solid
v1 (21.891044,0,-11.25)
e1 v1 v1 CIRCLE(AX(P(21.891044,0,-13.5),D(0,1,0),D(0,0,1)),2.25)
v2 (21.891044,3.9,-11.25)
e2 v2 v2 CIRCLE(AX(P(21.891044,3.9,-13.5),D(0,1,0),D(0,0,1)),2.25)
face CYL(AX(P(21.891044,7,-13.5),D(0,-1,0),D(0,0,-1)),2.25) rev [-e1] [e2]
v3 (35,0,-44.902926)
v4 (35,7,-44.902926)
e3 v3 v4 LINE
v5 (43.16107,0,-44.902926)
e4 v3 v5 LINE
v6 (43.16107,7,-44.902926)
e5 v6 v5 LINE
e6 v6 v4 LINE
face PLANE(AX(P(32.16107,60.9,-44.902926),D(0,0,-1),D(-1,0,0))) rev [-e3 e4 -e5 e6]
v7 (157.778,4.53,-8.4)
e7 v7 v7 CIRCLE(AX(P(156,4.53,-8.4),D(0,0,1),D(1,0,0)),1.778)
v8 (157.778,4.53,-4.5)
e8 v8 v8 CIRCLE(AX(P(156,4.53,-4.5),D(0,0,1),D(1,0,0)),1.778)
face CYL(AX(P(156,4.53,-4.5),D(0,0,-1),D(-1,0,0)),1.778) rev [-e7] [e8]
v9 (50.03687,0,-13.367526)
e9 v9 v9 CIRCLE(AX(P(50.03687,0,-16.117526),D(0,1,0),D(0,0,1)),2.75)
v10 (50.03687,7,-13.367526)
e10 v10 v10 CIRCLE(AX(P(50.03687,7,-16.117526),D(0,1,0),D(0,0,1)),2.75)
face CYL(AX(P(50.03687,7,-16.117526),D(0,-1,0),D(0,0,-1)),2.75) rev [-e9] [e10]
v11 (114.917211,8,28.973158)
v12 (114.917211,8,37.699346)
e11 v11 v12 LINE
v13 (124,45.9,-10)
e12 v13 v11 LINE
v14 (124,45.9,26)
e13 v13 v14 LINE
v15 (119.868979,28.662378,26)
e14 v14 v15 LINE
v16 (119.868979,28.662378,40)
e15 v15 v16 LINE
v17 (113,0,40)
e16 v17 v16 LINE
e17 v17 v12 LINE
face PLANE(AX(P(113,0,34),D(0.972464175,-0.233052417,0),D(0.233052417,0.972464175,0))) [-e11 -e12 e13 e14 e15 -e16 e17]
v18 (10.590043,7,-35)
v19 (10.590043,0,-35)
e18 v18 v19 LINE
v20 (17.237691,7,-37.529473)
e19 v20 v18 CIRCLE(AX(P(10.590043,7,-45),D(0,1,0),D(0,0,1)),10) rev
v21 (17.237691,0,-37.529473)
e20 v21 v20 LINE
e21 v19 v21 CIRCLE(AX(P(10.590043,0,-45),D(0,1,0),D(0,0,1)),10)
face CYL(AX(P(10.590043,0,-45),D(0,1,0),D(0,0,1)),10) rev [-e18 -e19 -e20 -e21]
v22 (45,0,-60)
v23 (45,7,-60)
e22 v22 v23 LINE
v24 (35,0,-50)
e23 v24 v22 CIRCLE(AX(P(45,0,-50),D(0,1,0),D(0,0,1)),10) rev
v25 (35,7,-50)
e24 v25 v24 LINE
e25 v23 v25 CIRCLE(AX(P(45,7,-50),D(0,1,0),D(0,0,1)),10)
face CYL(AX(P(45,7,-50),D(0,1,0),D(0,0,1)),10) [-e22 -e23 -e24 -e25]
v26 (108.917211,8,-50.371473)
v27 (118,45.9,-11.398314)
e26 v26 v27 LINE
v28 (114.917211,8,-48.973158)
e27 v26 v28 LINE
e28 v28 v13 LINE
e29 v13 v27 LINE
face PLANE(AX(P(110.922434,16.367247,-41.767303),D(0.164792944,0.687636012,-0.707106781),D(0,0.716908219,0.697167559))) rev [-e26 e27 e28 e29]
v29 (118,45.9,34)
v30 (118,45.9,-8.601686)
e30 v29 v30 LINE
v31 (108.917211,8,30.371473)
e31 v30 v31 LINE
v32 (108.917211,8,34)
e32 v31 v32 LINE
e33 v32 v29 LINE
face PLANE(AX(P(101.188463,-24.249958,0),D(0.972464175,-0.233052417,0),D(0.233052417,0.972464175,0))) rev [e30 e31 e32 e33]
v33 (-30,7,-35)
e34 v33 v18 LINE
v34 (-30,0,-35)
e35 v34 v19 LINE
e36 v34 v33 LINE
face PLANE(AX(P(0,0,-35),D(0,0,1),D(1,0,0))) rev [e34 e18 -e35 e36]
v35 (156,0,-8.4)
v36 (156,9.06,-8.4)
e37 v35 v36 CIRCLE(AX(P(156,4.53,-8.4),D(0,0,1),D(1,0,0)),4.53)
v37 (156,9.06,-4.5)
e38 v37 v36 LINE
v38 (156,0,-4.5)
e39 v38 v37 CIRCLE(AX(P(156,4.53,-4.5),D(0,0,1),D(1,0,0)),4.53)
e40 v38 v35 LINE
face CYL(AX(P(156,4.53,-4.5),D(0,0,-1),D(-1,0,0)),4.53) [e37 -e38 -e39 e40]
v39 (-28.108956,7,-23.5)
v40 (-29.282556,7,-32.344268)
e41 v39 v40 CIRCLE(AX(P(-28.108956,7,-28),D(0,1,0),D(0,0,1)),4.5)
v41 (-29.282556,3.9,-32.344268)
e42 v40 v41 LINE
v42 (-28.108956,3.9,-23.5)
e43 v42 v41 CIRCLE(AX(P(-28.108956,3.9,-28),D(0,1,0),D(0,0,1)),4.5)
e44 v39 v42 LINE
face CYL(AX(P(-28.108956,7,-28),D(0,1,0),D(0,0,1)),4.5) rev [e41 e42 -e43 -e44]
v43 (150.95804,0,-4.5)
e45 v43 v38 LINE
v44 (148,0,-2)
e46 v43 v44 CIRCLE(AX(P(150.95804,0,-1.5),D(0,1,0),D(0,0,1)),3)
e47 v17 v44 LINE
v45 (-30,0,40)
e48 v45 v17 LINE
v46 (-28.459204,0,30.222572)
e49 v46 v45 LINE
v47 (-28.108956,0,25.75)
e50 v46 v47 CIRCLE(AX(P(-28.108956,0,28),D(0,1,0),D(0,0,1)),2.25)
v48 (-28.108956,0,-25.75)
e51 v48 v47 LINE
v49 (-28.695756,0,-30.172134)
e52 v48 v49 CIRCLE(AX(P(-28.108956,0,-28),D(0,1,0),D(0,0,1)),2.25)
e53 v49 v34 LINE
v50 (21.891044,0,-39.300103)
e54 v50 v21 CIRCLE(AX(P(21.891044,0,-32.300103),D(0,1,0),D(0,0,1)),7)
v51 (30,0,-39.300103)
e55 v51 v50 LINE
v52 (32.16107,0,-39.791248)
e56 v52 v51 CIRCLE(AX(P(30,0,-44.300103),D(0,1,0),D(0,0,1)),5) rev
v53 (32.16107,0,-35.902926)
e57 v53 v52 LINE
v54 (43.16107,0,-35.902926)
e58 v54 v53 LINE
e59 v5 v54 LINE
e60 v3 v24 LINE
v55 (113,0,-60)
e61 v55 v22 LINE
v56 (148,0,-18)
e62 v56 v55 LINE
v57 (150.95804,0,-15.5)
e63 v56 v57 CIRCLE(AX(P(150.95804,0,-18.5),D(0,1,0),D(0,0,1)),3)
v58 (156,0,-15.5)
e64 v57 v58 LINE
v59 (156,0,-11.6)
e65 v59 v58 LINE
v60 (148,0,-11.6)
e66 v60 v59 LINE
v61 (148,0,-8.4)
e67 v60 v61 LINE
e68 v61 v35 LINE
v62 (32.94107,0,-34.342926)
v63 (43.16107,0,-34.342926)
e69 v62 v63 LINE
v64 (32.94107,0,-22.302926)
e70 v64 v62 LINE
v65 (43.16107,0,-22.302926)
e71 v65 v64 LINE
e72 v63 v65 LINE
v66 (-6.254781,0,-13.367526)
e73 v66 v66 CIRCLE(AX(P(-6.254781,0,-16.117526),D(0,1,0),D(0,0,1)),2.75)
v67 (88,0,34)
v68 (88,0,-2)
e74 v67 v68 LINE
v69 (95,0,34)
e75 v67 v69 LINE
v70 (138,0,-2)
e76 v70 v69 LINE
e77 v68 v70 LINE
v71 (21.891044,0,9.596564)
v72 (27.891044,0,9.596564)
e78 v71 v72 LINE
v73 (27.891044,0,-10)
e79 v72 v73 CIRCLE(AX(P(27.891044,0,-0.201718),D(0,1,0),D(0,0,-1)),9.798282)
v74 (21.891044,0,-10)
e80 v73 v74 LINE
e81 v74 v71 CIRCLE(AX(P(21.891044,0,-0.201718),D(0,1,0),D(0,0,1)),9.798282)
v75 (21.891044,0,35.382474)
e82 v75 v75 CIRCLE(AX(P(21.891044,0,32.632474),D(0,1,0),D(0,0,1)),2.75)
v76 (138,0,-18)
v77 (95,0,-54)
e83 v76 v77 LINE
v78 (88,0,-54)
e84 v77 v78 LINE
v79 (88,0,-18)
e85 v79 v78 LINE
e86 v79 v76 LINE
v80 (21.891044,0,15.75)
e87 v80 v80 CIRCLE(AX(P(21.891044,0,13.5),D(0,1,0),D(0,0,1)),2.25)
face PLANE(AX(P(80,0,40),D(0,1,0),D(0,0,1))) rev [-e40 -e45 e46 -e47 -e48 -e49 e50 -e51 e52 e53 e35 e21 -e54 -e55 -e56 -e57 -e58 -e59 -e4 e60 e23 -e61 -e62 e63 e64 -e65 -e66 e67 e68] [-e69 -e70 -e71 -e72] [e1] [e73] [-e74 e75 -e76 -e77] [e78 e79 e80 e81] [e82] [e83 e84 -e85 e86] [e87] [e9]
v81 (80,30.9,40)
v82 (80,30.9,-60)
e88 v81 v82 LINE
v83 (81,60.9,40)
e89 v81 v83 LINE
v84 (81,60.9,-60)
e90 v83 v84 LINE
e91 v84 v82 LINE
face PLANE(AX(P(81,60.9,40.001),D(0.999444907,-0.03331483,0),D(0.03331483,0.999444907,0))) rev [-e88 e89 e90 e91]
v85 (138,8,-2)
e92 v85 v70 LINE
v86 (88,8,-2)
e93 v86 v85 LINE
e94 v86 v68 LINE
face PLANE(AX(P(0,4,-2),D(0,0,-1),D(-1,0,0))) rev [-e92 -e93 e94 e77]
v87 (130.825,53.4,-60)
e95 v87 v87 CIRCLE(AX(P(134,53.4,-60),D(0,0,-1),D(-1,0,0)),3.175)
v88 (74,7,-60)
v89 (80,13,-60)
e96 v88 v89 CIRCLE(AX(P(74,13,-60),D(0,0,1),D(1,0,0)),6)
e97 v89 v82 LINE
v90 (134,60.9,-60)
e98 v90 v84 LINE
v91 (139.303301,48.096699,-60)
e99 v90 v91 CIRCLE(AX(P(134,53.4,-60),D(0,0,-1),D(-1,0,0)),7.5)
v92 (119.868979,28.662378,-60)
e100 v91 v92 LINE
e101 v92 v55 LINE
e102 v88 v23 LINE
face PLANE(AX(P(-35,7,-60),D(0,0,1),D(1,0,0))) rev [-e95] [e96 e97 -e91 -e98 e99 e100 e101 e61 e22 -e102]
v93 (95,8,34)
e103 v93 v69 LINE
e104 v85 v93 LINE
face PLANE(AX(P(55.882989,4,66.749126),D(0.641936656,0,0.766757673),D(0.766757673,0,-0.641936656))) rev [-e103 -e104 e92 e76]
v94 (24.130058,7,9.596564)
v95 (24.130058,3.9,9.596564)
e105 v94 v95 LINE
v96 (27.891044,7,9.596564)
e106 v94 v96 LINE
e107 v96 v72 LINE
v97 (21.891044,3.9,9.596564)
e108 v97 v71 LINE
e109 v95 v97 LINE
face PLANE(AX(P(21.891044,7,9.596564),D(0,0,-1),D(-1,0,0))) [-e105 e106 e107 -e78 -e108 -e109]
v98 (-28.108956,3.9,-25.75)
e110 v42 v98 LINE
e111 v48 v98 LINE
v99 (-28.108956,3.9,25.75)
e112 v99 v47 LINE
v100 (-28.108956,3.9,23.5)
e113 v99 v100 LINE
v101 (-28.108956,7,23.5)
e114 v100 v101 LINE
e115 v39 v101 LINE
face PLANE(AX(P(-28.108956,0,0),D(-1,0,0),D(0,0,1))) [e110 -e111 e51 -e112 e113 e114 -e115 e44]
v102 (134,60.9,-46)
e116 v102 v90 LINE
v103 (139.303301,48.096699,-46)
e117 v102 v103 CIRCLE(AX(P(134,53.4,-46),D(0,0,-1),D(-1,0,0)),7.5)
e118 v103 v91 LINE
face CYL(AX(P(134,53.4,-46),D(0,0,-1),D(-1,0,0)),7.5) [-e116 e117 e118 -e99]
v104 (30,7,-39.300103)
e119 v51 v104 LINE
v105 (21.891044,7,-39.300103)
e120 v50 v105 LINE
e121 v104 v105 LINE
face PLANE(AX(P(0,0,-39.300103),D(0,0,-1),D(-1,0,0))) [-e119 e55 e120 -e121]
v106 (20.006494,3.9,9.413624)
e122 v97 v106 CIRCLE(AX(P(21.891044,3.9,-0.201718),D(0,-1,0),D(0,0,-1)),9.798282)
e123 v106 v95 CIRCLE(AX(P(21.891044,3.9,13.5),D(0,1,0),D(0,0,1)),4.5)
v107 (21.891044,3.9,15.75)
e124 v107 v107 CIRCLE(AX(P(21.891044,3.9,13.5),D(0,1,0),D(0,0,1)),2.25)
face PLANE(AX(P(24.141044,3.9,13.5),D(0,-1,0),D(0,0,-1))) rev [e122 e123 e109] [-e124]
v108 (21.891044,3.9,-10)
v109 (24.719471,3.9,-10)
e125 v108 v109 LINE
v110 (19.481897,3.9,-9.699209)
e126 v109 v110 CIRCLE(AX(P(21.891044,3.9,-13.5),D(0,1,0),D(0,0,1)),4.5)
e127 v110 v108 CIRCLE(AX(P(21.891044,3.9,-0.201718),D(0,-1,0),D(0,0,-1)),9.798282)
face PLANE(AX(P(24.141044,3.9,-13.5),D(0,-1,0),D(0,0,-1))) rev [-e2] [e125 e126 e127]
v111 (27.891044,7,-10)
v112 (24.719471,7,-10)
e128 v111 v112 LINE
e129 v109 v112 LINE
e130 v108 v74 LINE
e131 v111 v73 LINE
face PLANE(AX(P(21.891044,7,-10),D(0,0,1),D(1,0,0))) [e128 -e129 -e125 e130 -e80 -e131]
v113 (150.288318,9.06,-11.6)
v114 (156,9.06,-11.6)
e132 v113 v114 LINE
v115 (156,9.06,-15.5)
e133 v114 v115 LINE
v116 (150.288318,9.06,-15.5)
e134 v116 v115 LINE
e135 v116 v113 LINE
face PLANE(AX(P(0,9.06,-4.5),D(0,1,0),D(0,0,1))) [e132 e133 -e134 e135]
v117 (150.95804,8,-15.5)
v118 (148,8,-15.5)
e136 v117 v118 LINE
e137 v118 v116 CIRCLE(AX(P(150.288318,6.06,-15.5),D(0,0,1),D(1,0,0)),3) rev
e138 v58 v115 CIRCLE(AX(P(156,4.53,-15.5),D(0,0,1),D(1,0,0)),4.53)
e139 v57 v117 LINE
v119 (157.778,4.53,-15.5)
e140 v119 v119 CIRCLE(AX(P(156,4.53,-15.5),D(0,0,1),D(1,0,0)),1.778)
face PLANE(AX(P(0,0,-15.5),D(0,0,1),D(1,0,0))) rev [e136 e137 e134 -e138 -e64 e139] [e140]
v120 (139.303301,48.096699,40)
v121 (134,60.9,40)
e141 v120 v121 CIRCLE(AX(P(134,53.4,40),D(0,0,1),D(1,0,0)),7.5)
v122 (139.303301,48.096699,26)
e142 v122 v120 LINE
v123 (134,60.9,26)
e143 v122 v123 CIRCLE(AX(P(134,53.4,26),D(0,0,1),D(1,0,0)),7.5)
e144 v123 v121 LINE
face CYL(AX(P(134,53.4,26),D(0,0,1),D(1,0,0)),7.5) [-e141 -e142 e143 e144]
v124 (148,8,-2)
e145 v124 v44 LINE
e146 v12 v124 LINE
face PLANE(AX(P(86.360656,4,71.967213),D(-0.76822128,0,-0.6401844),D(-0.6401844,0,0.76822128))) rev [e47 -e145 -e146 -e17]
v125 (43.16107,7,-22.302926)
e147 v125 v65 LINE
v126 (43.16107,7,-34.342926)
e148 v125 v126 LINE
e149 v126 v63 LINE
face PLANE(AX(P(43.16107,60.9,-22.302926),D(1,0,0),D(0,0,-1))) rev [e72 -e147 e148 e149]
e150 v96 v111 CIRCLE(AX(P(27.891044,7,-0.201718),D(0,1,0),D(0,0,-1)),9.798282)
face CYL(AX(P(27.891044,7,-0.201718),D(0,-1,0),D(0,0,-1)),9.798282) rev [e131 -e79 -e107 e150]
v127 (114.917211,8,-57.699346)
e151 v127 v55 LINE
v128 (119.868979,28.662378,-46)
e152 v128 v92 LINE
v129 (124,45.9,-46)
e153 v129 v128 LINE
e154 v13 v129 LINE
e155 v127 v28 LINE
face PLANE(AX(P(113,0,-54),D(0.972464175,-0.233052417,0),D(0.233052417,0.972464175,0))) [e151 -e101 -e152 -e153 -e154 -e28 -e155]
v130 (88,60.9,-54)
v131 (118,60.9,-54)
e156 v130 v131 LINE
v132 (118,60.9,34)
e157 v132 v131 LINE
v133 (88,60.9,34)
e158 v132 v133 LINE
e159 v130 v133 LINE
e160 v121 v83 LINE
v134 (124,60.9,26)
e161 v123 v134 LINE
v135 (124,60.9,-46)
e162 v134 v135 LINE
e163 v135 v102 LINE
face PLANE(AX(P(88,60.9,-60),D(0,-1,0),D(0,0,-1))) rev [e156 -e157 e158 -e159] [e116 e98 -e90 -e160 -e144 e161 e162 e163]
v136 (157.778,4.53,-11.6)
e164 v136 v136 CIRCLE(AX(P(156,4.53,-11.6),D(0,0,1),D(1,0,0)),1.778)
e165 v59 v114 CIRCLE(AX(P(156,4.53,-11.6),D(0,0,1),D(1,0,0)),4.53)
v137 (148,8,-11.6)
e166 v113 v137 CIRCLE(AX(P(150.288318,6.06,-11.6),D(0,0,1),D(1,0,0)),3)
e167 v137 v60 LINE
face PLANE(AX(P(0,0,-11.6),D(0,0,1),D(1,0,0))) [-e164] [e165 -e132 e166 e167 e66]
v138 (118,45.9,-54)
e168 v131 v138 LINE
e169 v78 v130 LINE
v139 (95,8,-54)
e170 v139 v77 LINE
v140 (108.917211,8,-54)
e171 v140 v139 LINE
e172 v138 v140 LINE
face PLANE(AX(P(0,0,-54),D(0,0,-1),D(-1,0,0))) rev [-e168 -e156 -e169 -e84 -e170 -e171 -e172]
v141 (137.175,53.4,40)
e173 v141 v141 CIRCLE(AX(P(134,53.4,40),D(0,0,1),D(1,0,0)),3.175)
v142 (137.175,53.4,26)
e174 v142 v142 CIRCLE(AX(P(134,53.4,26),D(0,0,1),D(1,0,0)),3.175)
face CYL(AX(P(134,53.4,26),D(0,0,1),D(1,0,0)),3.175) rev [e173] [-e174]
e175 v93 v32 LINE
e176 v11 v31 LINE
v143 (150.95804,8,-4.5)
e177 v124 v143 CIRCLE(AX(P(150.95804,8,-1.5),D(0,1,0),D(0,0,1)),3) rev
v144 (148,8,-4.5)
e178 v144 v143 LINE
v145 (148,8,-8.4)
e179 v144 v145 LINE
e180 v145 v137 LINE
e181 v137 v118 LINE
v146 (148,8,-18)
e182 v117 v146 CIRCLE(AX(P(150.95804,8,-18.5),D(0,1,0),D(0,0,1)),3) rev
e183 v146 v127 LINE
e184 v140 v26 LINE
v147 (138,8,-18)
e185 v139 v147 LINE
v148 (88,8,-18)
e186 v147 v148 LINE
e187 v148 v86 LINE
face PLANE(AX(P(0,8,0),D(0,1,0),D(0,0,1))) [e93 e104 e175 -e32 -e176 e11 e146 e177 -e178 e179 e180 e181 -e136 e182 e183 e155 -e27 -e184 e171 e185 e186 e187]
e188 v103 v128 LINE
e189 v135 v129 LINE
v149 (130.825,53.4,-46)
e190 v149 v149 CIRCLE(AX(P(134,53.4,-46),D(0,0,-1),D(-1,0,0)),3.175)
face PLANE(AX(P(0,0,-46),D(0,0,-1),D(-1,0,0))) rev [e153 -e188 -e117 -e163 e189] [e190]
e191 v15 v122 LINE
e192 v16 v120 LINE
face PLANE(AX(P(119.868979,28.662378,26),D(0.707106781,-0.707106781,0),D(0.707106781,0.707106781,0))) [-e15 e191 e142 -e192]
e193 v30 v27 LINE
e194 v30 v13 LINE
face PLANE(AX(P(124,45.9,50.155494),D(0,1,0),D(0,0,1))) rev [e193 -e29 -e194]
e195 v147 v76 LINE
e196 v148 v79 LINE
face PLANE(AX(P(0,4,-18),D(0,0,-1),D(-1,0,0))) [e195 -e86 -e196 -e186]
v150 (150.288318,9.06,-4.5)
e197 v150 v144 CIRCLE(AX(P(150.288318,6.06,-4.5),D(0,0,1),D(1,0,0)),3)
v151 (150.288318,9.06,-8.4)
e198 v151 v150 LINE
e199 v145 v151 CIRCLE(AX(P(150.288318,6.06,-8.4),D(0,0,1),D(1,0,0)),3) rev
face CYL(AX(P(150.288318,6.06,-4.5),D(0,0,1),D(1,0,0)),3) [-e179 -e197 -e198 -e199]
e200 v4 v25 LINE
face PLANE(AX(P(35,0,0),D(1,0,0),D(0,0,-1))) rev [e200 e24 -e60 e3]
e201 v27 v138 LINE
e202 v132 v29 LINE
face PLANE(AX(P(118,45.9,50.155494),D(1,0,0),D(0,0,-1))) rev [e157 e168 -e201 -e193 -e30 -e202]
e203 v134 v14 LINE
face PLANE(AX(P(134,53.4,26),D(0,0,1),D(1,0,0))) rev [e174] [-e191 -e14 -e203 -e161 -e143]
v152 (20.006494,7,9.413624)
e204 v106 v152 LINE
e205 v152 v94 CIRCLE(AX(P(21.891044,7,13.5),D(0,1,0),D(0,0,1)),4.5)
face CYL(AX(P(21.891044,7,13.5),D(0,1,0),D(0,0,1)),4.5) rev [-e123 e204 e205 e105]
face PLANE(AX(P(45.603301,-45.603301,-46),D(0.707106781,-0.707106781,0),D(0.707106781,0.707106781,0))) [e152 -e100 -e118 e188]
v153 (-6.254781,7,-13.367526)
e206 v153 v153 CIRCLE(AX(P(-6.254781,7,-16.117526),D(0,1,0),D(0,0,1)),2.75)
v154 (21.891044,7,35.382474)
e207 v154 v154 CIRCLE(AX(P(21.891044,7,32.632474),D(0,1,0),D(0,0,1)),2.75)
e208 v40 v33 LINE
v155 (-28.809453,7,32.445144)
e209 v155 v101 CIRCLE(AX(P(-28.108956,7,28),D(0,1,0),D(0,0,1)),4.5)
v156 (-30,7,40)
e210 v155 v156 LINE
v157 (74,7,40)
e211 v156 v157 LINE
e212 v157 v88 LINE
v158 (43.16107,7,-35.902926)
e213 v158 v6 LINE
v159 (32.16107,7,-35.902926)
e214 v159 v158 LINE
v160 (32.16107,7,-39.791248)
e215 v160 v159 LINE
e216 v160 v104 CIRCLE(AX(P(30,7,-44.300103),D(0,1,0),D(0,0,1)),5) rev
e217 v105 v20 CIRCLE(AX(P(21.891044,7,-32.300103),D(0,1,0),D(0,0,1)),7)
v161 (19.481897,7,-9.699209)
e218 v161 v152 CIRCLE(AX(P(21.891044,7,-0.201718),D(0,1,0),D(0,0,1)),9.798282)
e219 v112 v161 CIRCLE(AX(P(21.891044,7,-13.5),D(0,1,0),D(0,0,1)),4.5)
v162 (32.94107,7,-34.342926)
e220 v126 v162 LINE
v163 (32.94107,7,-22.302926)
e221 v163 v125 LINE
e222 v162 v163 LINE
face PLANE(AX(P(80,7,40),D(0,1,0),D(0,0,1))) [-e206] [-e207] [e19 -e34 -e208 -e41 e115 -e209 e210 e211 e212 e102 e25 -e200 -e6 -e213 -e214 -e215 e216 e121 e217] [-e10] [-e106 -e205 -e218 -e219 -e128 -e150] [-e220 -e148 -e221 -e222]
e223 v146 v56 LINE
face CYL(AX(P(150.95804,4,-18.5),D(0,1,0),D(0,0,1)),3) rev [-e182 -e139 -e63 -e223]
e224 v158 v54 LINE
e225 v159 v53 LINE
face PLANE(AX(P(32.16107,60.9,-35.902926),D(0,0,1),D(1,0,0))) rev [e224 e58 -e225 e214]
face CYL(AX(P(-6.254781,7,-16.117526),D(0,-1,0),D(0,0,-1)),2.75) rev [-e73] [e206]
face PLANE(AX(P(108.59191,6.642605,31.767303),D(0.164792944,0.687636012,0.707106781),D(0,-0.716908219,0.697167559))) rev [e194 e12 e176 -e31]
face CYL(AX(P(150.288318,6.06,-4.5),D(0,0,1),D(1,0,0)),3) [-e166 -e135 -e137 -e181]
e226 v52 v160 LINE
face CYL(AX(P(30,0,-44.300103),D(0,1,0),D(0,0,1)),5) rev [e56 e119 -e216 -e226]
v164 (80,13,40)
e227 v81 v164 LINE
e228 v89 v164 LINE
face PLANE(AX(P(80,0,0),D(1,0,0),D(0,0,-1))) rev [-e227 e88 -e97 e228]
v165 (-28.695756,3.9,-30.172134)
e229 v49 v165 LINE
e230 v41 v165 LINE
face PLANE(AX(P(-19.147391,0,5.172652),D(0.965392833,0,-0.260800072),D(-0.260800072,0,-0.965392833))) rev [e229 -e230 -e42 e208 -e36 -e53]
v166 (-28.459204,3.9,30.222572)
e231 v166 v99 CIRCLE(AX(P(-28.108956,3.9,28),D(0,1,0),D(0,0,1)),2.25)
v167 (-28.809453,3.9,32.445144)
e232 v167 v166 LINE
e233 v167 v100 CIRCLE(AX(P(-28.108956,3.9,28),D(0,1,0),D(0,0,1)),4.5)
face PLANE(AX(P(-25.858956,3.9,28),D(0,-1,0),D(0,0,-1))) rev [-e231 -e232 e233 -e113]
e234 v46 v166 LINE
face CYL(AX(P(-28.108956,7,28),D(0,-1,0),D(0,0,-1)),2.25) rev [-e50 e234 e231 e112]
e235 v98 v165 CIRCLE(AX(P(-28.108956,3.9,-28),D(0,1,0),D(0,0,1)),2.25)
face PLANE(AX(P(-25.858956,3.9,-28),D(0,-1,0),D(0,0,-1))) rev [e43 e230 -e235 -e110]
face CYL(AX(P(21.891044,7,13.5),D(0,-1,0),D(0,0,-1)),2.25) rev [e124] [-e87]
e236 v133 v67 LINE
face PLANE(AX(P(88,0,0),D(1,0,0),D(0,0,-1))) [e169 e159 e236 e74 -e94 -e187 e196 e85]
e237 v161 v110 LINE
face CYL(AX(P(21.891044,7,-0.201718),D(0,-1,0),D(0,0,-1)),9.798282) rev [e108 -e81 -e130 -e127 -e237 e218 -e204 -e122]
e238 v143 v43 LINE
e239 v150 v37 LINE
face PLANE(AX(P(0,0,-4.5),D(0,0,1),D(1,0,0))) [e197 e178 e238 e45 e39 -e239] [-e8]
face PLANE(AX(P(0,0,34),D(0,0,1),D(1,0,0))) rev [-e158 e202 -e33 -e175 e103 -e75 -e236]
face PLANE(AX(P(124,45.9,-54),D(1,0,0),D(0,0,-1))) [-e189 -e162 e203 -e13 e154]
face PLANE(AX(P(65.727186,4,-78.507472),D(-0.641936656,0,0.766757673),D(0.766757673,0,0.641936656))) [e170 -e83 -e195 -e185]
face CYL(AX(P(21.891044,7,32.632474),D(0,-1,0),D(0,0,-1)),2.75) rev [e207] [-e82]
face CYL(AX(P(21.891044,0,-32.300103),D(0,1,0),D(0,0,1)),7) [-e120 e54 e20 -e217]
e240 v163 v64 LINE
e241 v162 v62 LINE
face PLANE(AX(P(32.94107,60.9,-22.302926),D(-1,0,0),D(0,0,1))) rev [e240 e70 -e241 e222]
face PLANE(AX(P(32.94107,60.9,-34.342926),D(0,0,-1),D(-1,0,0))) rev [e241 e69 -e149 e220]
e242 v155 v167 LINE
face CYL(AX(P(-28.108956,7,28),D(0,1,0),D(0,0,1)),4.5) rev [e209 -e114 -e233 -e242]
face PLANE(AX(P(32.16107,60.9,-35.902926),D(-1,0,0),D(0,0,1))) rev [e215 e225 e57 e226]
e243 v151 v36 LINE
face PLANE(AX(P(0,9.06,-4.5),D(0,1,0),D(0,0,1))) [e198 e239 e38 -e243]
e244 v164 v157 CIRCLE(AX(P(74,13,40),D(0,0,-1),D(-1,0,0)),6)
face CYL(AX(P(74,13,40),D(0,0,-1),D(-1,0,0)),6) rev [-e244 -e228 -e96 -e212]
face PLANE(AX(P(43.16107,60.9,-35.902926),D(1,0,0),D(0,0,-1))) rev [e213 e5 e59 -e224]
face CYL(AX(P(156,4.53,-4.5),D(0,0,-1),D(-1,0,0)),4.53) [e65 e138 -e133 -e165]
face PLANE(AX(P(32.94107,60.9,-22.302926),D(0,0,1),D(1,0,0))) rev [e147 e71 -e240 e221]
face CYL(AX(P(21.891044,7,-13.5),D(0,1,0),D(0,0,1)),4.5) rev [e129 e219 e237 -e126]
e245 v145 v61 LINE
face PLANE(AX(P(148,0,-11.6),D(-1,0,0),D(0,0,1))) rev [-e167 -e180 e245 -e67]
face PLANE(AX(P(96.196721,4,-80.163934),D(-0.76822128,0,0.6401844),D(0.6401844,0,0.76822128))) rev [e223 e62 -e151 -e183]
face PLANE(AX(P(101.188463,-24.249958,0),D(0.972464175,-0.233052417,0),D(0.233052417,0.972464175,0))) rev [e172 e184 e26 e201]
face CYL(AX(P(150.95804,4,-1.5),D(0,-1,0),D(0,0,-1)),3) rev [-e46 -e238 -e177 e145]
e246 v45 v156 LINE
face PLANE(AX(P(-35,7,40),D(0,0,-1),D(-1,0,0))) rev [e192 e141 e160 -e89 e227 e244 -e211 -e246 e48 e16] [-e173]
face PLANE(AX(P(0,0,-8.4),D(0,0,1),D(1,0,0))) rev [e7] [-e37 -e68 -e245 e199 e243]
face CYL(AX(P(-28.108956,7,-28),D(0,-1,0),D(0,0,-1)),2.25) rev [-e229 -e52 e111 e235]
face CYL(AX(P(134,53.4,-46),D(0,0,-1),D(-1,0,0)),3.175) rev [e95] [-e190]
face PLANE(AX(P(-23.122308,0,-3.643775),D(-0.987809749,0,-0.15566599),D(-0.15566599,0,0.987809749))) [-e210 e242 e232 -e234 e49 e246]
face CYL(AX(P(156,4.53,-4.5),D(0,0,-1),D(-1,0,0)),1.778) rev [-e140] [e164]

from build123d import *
from build123d.topology import SkipClean

# Parameters (mm, degrees)
SKETCH1_W                                        = 115
SKETCH1_H                                        = 100
EXTRUDE1_DEPTH                                   = 7
SKETCH2_R                                        = 2.75
SKETCH2_R_2                                      = 2.25
EXTRUDE7_DEPTH                                   = 7
CBORE_FOR_M4_PAN_HEAD_MACHINE_SCREW2_D           = 4.5
CBORE_FOR_M4_PAN_HEAD_MACHINE_SCREW2_CBORE_D     = 9
CBORE_FOR_M4_PAN_HEAD_MACHINE_SCREW2_CBORE_DEPTH = 3.1
EXTRUDE9_DEPTH                                   = 101.244700608
FILLET1_R                                        = 10
SKETCH19_W                                       = 100
SKETCH19_H                                       = 60.9
BOSS_EXTRUDE1_DEPTH                              = 8
BOSS_EXTRUDE2_DEPTH                              = 6
BOSS_EXTRUDE3_DEPTH                              = 6
SKETCH22_W                                       = 6
SKETCH22_H                                       = 15
BOSS_EXTRUDE4_DEPTH                              = 88
BOSS_EXTRUDE5_DEPTH                              = 5.834785
SKETCH25_R                                       = 3.175
BOSS_EXTRUDE6_DEPTH                              = 14
BOSS_EXTRUDE7_START                              = -14
SKETCH26_R                                       = 3.175
BOSS_EXTRUDE7_DEPTH                              = 14
FILLET2_R                                        = 6
BOSS_EXTRUDE8_DEPTH                              = 4
BOSS_EXTRUDE9_DEPTH                              = 4
BOSS_EXTRUDE10_DEPTH                             = 5.5
CUT_EXTRUDE1_DEPTH                               = 1.6
FILLET3_R                                        = 3
SKETCH30_W                                       = 10.22
SKETCH30_H                                       = 12.04
SKETCH30_W_2                                     = 11
SKETCH30_H_2                                     = 9
CUT_EXTRUDE2_DEPTH                               = 182.875481855
CUT_EXTRUDE3_REACH                               = 200.692


with BuildPart() as part:
    # Sketch1 → Extrude1 (new body)
    with BuildSketch(Plane(origin=(0, 0, 0), x_dir=(1, 0, 0), z_dir=(0, 1, 0))):
        with Locations((22.5, 10)):
            Rectangle(SKETCH1_W, SKETCH1_H)
    extrude(amount=EXTRUDE1_DEPTH)

    # Sketch2 → Extrude7 (cut)
    with BuildSketch(Plane(origin=(0, 0, 0), x_dir=(1, 0, 0), z_dir=(0, 1, 0))):
        with Locations(Location((-6.254781434, 16.117525773, 0), (0, 0, 270))):
            Circle(SKETCH2_R)
        with Locations(Location((50.036869812, 16.117525773, 0), (0, 0, 270))):
            Circle(SKETCH2_R)
        with Locations(Location((-28.108955811, -28, 0), (0, 0, 270))):
            Circle(SKETCH2_R_2)
        with Locations(Location((-28.108955811, 28, 0), (0, 0, 270))):
            Circle(SKETCH2_R_2)
        with Locations(Location((21.891044189, -32.632474227, 0), (0, 0, 270))):
            Circle(SKETCH2_R)
        with Locations(Location((21.891044189, -13.5, 0), (0, 0, 270))):
            Circle(SKETCH2_R_2)
        with Locations(Location((21.891044189, 13.5, 0), (0, 0, 270))):
            Circle(SKETCH2_R_2)
        with BuildLine():
            Line((21.891044189, 10), (27.891044189, 10))
            ThreePointArc((27.891044189, 10), (37.689325953, 0.201718236), (27.891044189, -9.596563528))
            Line((27.891044189, -9.596563528), (21.891044189, -9.596563528))
            ThreePointArc((21.891044189, -9.596563528), (12.092762425, 0.201718236), (21.891044189, 10))
        make_face()
    extrude(amount=EXTRUDE7_DEPTH, mode=Mode.SUBTRACT)

    # CBORE for M4 Pan Head Machine Screw2 (through all)
    with Locations(Plane(origin=(-28.108955811, 7, -28), x_dir=(0, 0, 1), z_dir=(0, 1, 0))):
        with Locations((0, 0), (14.5, 50), (41.5, 50), (56, 0)):
            CounterBoreHole(CBORE_FOR_M4_PAN_HEAD_MACHINE_SCREW2_D / 2, CBORE_FOR_M4_PAN_HEAD_MACHINE_SCREW2_CBORE_D / 2, CBORE_FOR_M4_PAN_HEAD_MACHINE_SCREW2_CBORE_DEPTH)

    # Sketch18 → Extrude9 (cut, through all)
    with BuildSketch(Plane(origin=(0, 7, 0), x_dir=(1, 0, 0), z_dir=(0, 1, 0))):
        with BuildLine():
            Line((21.891044189, 39.300103485), (30, 39.300103485))
            ThreePointArc((30, 39.300103485), (33.535533906, 40.764569579), (35, 44.300103485))
            Line((35, 44.300103485), (35, 60))
            Line((35, 60), (-35, 60))
            Line((-35, 60), (-35, 35))
            Line((-35, 35), (-35, -40))
            Line((-35, -40), (-30, -40))
            Line((-30, -40), (-28.108955811, -28))
            Line((-28.108955811, -28), (-28.108955811, 28))
            Line((-28.108955811, 28), (-30, 35))
            Line((-30, 35), (15.43267297, 35))
            ThreePointArc((15.43267297, 35), (18.01156456, 38.126735256), (21.891044189, 39.300103485))
        make_face()
    extrude(amount=-EXTRUDE9_DEPTH, mode=Mode.SUBTRACT)

    # Fillet1
    fillet1_edges = [part.edges().sort_by_distance(p)[0] for p in [
        (15.43267297, 3.5, -35),
        (35, 3.5, -60),
    ]]
    fillet(fillet1_edges, radius=FILLET1_R)

    # Sketch19 → Boss-Extrude1 (add)
    with BuildSketch(Plane(origin=(80, 0, 0), x_dir=(0, 0, -1), z_dir=(1, 0, 0))):
        with Locations((10, 30.45)):
            Rectangle(SKETCH19_W, SKETCH19_H)
    extrude(amount=BOSS_EXTRUDE1_DEPTH)

    # Sketch20 → Boss-Extrude2 (add)
    with BuildSketch(Plane(origin=(0, 0, -60), x_dir=(-1, 0, 0), z_dir=(0, 0, -1))):
        Polygon((-88, 0), (-113, 0), (-124, 45.9), (-124, 60.9), (-88, 60.9), (-80, 60.9), (-80, 7), (-45, 7), (-45, 0), align=None)
    extrude(amount=-BOSS_EXTRUDE2_DEPTH)

    # Sketch21 → Boss-Extrude3 (add)
    with BuildSketch(Plane.XY.offset(40)):
        Polygon((88, 60.9), (88, 0), (113, 0), (124, 45.9), (124, 60.9), align=None)
    extrude(amount=-BOSS_EXTRUDE3_DEPTH)

    # Sketch22 → Boss-Extrude4 (add)
    with BuildSketch(Plane.XY.offset(-54)):
        with Locations((121, 53.4)):
            Rectangle(SKETCH22_W, SKETCH22_H)
    extrude(amount=BOSS_EXTRUDE4_DEPTH)

    # Sketch23 → Boss-Extrude5 (add)
    with BuildSketch(Plane(origin=(106.862582536, -25.609769235, 0), x_dir=(0, 0, -1), z_dir=(0.9724641747215814, -0.2330524165999433, 0))):
        Polygon((10, 73.534605278), (54, 29.534605278), (54, 73.534605278), align=None)
        Polygon((-34, 29.534605278), (10, 73.534605278), (-34, 73.534605278), align=None)
    extrude(amount=-BOSS_EXTRUDE5_DEPTH)

    # Sketch25 → Boss-Extrude6 (add)
    # profile 1 of 2: a face of its own
    with BuildSketch(Plane(origin=(0, 0, -60), x_dir=(-1, 0, 0), z_dir=(0, 0, -1))):
        with BuildLine():
            Line((-124, 60.9), (-134, 60.9))
            ThreePointArc((-134, 60.9), (-141.5, 53.4), (-134, 45.9))
            Line((-134, 45.9), (-124, 45.9))
            Line((-124, 45.9), (-124, 60.9))
        make_face()
        with Locations((-134, 53.4)):
            Circle(SKETCH25_R, mode=Mode.SUBTRACT)
    # profile 2 of 2: a face of its own
    with BuildSketch(Plane(origin=(0, 0, -60), x_dir=(-1, 0, 0), z_dir=(0, 0, -1))):
        with BuildLine():
            Line((-119.868979401, 28.662377683), (-124, 45.9))
            Line((-124, 45.9), (-134, 45.9))
            ThreePointArc((-134, 45.9), (-136.870125743, 46.470903506), (-139.303300859, 48.096699141))
            Line((-139.303300859, 48.096699141), (-119.868979401, 28.662377683))
        make_face()
    extrude(amount=-BOSS_EXTRUDE6_DEPTH)

    # Sketch26 → Boss-Extrude7 (add)
    with BuildSketch(Plane.XY.offset(40).offset(BOSS_EXTRUDE7_START)):
        with BuildLine():
            Line((134, 60.9), (124, 60.9))
            Line((124, 60.9), (124, 45.9))
            Line((124, 45.9), (119.868979401, 28.662377683))
            Line((119.868979401, 28.662377683), (139.303300859, 48.096699141))
            ThreePointArc((139.303300859, 48.096699141), (140.929096494, 56.270125743), (134, 60.9))
        make_face()
        with Locations(Location((134, 53.4, 0), (0, 0, 180))):
            Circle(SKETCH26_R, mode=Mode.SUBTRACT)
    extrude(amount=BOSS_EXTRUDE7_DEPTH)

    # Fillet2
    fillet2_edges = [part.edges().sort_by_distance(p)[0] for p in [
        (80, 7, -10),
    ]]
    fillet(fillet2_edges, radius=FILLET2_R)

    # Sketch27 → Boss-Extrude8 (add)
    with BuildSketch(Plane.XZ):
        Polygon((95, 34), (138, -2), (148, -2), (113, 40), (113, 34), align=None)
        Polygon((138, -2), (88, -2), (88, -10), (148, -10), (148, -2), align=None)
        Polygon((148, -18), (138, -18), (95, -54), (113, -54), (113, -60), align=None)
        Polygon((148, -10), (88, -10), (88, -18), (138, -18), (148, -18), align=None)
    extrude(amount=-BOSS_EXTRUDE8_DEPTH)

    # Sketch28 → Boss-Extrude9 (add)
    with BuildSketch(Plane(origin=(0, 4, 0), x_dir=(1, 0, 0), z_dir=(0, 1, 0))):
        Polygon((113.958605664, 58.849673203), (113.958605664, 53.086420137), (110.038543918, 54), (95, 54), (138, 18), (88, 18), (88, 2), (138, 2), (95, -34), (110.038543918, -34), (113.958605664, -33.086420137), (113.958605664, -38.849673203), (148, 2), (148, 18), align=None)
    extrude(amount=BOSS_EXTRUDE9_DEPTH)

    # Sketch29 → Boss-Extrude10 (add, symmetric)
    with SkipClean():  # the faces are left unmerged after this step: merging them gives an invalid solid
        with BuildSketch(Plane.XY.offset(-10)):
            with BuildLine():
                ThreePointArc((160.53, 4.53), (159.203193719, 7.733193719), (156, 9.06))
                Line((156, 9.06), (156, 6.308))
                ThreePointArc((156, 6.308), (157.257235857, 5.787235857), (157.778, 4.53))
                ThreePointArc((157.778, 4.53), (157.257235857, 3.272764143), (156, 2.752))
                Line((156, 2.752), (156, 0))
                ThreePointArc((156, 0), (159.203193719, 1.326806281), (160.53, 4.53))
            make_face()
            with BuildLine():
                Line((156, 6.308), (156, 9.06))
                ThreePointArc((156, 9.06), (151.47, 4.53), (156, 0))
                Line((156, 0), (156, 2.752))
                ThreePointArc((156, 2.752), (154.222, 4.53), (156, 6.308))
            make_face()
            with BuildLine():
                Line((156, 9.06), (148, 9.06))
                Line((148, 9.06), (148, 0))
                Line((148, 0), (156, 0))
                ThreePointArc((156, 0), (151.47, 4.53), (156, 9.06))
            make_face()
        extrude(amount=BOSS_EXTRUDE10_DEPTH, both=True)

    # Sketch29<3> → Cut-Extrude1 (cut, symmetric)
    with BuildSketch(Plane.XY.offset(-10)):
        with BuildLine():
            Line((156, 9.06), (148, 9.06))
            Line((148, 9.06), (148, 0))
            Line((148, 0), (156, 0))
            ThreePointArc((156, 0), (151.47, 4.53), (156, 9.06))
        make_face()
        with BuildLine():
            ThreePointArc((160.53, 4.53), (159.203193719, 7.733193719), (156, 9.06))
            Line((156, 9.06), (156, 6.308))
            ThreePointArc((156, 6.308), (157.257235857, 5.787235857), (157.778, 4.53))
            ThreePointArc((157.778, 4.53), (157.257235857, 3.272764143), (156, 2.752))
            Line((156, 2.752), (156, 0))
            ThreePointArc((156, 0), (159.203193719, 1.326806281), (160.53, 4.53))
        make_face()
        with BuildLine():
            Line((156, 6.308), (156, 9.06))
            ThreePointArc((156, 9.06), (151.47, 4.53), (156, 0))
            Line((156, 0), (156, 2.752))
            ThreePointArc((156, 2.752), (154.222, 4.53), (156, 6.308))
        make_face()
    extrude(amount=CUT_EXTRUDE1_DEPTH, both=True, mode=Mode.SUBTRACT)

    # Fillet3
    # the kernel refuses this fillet: 3 mm, written as the material it adds along each edge
    with BuildSketch(Plane(origin=(148, 8, -15.5), x_dir=(0, 0, -1), z_dir=(0, -1, 0))) as fillet3_piece_1:
        with BuildLine():
            CenterArc((3, 2.958039892), FILLET3_R, 180, 80.405931773)
            Line((0, 2.958039892), (0, 0))
            Line((0, 0), (2.5, 0))
        make_face()
    extrude(amount=8)
    with BuildSketch(Plane(origin=(148, 8, -4.5), x_dir=(1, 0, 0), z_dir=(0, -1, 0))) as fillet3_piece_2:
        with BuildLine():
            CenterArc((2.958039892, 3), FILLET3_R, 189.594068227, 80.405931773)
            Line((0, 2.5), (0, 0))
            Line((0, 0), (2.958039892, 0))
        make_face()
    extrude(amount=8)
    # the kernel refuses this fillet: 3 mm, written as the material it takes off along each edge
    with BuildSketch(Plane(origin=(148, 9.06, -14.120795399), x_dir=(0, -1, 0), z_dir=(0, 0, 1))) as fillet3_2_piece_1:
        with BuildLine():
            CenterArc((3, 2.28831816), FILLET3_R, 180, 49.709248271)
            Line((0, 2.28831816), (0, 0))
            Line((0, 0), (1.06, 0))
        make_face()
    extrude(amount=15.341590798, mode=Mode.SUBTRACT)
    with BuildSketch(Plane(origin=(148, 9.06, -21.220795399), x_dir=(1, 0, 0), z_dir=(0, 0, 1))) as fillet3_2_piece_2:
        with BuildLine():
            CenterArc((2.28831816, -3), FILLET3_R, 90, 49.709248271)
            Line((0, -1.06), (0, 0))
            Line((0, 0), (2.28831816, 0))
        make_face()
    extrude(amount=15.341590798, mode=Mode.SUBTRACT)

    # Sketch30 → Cut-Extrude2 (cut, through all)
    with BuildSketch(Plane.XZ):
        with Locations((38.051069812, -28.322925773)):
            Rectangle(SKETCH30_W, SKETCH30_H)
        with Locations((37.661069812, -40.402925773)):
            Rectangle(SKETCH30_W_2, SKETCH30_H_2)
    extrude(amount=-CUT_EXTRUDE2_DEPTH, mode=Mode.SUBTRACT)

    # Sketch31 → Cut-Extrude3 (cut, up to next)
    with BuildSketch(Plane(origin=(0, 0, -60), x_dir=(-1, 0, 0), z_dir=(0, 0, -1)), mode=Mode.PRIVATE) as cut_extrude3_sk1:
        Polygon((-80, 60.9), (-81, 60.9), (-80, 30.9), align=None)
    cut_extrude3_tool1 = extrude(cut_extrude3_sk1.sketch, amount=-CUT_EXTRUDE3_REACH, mode=Mode.PRIVATE) & part.part
    add(cut_extrude3_tool1.solids().sort_by_distance((80.333333, 50.9, -60))[0], mode=Mode.SUBTRACT)


solid = part.part
